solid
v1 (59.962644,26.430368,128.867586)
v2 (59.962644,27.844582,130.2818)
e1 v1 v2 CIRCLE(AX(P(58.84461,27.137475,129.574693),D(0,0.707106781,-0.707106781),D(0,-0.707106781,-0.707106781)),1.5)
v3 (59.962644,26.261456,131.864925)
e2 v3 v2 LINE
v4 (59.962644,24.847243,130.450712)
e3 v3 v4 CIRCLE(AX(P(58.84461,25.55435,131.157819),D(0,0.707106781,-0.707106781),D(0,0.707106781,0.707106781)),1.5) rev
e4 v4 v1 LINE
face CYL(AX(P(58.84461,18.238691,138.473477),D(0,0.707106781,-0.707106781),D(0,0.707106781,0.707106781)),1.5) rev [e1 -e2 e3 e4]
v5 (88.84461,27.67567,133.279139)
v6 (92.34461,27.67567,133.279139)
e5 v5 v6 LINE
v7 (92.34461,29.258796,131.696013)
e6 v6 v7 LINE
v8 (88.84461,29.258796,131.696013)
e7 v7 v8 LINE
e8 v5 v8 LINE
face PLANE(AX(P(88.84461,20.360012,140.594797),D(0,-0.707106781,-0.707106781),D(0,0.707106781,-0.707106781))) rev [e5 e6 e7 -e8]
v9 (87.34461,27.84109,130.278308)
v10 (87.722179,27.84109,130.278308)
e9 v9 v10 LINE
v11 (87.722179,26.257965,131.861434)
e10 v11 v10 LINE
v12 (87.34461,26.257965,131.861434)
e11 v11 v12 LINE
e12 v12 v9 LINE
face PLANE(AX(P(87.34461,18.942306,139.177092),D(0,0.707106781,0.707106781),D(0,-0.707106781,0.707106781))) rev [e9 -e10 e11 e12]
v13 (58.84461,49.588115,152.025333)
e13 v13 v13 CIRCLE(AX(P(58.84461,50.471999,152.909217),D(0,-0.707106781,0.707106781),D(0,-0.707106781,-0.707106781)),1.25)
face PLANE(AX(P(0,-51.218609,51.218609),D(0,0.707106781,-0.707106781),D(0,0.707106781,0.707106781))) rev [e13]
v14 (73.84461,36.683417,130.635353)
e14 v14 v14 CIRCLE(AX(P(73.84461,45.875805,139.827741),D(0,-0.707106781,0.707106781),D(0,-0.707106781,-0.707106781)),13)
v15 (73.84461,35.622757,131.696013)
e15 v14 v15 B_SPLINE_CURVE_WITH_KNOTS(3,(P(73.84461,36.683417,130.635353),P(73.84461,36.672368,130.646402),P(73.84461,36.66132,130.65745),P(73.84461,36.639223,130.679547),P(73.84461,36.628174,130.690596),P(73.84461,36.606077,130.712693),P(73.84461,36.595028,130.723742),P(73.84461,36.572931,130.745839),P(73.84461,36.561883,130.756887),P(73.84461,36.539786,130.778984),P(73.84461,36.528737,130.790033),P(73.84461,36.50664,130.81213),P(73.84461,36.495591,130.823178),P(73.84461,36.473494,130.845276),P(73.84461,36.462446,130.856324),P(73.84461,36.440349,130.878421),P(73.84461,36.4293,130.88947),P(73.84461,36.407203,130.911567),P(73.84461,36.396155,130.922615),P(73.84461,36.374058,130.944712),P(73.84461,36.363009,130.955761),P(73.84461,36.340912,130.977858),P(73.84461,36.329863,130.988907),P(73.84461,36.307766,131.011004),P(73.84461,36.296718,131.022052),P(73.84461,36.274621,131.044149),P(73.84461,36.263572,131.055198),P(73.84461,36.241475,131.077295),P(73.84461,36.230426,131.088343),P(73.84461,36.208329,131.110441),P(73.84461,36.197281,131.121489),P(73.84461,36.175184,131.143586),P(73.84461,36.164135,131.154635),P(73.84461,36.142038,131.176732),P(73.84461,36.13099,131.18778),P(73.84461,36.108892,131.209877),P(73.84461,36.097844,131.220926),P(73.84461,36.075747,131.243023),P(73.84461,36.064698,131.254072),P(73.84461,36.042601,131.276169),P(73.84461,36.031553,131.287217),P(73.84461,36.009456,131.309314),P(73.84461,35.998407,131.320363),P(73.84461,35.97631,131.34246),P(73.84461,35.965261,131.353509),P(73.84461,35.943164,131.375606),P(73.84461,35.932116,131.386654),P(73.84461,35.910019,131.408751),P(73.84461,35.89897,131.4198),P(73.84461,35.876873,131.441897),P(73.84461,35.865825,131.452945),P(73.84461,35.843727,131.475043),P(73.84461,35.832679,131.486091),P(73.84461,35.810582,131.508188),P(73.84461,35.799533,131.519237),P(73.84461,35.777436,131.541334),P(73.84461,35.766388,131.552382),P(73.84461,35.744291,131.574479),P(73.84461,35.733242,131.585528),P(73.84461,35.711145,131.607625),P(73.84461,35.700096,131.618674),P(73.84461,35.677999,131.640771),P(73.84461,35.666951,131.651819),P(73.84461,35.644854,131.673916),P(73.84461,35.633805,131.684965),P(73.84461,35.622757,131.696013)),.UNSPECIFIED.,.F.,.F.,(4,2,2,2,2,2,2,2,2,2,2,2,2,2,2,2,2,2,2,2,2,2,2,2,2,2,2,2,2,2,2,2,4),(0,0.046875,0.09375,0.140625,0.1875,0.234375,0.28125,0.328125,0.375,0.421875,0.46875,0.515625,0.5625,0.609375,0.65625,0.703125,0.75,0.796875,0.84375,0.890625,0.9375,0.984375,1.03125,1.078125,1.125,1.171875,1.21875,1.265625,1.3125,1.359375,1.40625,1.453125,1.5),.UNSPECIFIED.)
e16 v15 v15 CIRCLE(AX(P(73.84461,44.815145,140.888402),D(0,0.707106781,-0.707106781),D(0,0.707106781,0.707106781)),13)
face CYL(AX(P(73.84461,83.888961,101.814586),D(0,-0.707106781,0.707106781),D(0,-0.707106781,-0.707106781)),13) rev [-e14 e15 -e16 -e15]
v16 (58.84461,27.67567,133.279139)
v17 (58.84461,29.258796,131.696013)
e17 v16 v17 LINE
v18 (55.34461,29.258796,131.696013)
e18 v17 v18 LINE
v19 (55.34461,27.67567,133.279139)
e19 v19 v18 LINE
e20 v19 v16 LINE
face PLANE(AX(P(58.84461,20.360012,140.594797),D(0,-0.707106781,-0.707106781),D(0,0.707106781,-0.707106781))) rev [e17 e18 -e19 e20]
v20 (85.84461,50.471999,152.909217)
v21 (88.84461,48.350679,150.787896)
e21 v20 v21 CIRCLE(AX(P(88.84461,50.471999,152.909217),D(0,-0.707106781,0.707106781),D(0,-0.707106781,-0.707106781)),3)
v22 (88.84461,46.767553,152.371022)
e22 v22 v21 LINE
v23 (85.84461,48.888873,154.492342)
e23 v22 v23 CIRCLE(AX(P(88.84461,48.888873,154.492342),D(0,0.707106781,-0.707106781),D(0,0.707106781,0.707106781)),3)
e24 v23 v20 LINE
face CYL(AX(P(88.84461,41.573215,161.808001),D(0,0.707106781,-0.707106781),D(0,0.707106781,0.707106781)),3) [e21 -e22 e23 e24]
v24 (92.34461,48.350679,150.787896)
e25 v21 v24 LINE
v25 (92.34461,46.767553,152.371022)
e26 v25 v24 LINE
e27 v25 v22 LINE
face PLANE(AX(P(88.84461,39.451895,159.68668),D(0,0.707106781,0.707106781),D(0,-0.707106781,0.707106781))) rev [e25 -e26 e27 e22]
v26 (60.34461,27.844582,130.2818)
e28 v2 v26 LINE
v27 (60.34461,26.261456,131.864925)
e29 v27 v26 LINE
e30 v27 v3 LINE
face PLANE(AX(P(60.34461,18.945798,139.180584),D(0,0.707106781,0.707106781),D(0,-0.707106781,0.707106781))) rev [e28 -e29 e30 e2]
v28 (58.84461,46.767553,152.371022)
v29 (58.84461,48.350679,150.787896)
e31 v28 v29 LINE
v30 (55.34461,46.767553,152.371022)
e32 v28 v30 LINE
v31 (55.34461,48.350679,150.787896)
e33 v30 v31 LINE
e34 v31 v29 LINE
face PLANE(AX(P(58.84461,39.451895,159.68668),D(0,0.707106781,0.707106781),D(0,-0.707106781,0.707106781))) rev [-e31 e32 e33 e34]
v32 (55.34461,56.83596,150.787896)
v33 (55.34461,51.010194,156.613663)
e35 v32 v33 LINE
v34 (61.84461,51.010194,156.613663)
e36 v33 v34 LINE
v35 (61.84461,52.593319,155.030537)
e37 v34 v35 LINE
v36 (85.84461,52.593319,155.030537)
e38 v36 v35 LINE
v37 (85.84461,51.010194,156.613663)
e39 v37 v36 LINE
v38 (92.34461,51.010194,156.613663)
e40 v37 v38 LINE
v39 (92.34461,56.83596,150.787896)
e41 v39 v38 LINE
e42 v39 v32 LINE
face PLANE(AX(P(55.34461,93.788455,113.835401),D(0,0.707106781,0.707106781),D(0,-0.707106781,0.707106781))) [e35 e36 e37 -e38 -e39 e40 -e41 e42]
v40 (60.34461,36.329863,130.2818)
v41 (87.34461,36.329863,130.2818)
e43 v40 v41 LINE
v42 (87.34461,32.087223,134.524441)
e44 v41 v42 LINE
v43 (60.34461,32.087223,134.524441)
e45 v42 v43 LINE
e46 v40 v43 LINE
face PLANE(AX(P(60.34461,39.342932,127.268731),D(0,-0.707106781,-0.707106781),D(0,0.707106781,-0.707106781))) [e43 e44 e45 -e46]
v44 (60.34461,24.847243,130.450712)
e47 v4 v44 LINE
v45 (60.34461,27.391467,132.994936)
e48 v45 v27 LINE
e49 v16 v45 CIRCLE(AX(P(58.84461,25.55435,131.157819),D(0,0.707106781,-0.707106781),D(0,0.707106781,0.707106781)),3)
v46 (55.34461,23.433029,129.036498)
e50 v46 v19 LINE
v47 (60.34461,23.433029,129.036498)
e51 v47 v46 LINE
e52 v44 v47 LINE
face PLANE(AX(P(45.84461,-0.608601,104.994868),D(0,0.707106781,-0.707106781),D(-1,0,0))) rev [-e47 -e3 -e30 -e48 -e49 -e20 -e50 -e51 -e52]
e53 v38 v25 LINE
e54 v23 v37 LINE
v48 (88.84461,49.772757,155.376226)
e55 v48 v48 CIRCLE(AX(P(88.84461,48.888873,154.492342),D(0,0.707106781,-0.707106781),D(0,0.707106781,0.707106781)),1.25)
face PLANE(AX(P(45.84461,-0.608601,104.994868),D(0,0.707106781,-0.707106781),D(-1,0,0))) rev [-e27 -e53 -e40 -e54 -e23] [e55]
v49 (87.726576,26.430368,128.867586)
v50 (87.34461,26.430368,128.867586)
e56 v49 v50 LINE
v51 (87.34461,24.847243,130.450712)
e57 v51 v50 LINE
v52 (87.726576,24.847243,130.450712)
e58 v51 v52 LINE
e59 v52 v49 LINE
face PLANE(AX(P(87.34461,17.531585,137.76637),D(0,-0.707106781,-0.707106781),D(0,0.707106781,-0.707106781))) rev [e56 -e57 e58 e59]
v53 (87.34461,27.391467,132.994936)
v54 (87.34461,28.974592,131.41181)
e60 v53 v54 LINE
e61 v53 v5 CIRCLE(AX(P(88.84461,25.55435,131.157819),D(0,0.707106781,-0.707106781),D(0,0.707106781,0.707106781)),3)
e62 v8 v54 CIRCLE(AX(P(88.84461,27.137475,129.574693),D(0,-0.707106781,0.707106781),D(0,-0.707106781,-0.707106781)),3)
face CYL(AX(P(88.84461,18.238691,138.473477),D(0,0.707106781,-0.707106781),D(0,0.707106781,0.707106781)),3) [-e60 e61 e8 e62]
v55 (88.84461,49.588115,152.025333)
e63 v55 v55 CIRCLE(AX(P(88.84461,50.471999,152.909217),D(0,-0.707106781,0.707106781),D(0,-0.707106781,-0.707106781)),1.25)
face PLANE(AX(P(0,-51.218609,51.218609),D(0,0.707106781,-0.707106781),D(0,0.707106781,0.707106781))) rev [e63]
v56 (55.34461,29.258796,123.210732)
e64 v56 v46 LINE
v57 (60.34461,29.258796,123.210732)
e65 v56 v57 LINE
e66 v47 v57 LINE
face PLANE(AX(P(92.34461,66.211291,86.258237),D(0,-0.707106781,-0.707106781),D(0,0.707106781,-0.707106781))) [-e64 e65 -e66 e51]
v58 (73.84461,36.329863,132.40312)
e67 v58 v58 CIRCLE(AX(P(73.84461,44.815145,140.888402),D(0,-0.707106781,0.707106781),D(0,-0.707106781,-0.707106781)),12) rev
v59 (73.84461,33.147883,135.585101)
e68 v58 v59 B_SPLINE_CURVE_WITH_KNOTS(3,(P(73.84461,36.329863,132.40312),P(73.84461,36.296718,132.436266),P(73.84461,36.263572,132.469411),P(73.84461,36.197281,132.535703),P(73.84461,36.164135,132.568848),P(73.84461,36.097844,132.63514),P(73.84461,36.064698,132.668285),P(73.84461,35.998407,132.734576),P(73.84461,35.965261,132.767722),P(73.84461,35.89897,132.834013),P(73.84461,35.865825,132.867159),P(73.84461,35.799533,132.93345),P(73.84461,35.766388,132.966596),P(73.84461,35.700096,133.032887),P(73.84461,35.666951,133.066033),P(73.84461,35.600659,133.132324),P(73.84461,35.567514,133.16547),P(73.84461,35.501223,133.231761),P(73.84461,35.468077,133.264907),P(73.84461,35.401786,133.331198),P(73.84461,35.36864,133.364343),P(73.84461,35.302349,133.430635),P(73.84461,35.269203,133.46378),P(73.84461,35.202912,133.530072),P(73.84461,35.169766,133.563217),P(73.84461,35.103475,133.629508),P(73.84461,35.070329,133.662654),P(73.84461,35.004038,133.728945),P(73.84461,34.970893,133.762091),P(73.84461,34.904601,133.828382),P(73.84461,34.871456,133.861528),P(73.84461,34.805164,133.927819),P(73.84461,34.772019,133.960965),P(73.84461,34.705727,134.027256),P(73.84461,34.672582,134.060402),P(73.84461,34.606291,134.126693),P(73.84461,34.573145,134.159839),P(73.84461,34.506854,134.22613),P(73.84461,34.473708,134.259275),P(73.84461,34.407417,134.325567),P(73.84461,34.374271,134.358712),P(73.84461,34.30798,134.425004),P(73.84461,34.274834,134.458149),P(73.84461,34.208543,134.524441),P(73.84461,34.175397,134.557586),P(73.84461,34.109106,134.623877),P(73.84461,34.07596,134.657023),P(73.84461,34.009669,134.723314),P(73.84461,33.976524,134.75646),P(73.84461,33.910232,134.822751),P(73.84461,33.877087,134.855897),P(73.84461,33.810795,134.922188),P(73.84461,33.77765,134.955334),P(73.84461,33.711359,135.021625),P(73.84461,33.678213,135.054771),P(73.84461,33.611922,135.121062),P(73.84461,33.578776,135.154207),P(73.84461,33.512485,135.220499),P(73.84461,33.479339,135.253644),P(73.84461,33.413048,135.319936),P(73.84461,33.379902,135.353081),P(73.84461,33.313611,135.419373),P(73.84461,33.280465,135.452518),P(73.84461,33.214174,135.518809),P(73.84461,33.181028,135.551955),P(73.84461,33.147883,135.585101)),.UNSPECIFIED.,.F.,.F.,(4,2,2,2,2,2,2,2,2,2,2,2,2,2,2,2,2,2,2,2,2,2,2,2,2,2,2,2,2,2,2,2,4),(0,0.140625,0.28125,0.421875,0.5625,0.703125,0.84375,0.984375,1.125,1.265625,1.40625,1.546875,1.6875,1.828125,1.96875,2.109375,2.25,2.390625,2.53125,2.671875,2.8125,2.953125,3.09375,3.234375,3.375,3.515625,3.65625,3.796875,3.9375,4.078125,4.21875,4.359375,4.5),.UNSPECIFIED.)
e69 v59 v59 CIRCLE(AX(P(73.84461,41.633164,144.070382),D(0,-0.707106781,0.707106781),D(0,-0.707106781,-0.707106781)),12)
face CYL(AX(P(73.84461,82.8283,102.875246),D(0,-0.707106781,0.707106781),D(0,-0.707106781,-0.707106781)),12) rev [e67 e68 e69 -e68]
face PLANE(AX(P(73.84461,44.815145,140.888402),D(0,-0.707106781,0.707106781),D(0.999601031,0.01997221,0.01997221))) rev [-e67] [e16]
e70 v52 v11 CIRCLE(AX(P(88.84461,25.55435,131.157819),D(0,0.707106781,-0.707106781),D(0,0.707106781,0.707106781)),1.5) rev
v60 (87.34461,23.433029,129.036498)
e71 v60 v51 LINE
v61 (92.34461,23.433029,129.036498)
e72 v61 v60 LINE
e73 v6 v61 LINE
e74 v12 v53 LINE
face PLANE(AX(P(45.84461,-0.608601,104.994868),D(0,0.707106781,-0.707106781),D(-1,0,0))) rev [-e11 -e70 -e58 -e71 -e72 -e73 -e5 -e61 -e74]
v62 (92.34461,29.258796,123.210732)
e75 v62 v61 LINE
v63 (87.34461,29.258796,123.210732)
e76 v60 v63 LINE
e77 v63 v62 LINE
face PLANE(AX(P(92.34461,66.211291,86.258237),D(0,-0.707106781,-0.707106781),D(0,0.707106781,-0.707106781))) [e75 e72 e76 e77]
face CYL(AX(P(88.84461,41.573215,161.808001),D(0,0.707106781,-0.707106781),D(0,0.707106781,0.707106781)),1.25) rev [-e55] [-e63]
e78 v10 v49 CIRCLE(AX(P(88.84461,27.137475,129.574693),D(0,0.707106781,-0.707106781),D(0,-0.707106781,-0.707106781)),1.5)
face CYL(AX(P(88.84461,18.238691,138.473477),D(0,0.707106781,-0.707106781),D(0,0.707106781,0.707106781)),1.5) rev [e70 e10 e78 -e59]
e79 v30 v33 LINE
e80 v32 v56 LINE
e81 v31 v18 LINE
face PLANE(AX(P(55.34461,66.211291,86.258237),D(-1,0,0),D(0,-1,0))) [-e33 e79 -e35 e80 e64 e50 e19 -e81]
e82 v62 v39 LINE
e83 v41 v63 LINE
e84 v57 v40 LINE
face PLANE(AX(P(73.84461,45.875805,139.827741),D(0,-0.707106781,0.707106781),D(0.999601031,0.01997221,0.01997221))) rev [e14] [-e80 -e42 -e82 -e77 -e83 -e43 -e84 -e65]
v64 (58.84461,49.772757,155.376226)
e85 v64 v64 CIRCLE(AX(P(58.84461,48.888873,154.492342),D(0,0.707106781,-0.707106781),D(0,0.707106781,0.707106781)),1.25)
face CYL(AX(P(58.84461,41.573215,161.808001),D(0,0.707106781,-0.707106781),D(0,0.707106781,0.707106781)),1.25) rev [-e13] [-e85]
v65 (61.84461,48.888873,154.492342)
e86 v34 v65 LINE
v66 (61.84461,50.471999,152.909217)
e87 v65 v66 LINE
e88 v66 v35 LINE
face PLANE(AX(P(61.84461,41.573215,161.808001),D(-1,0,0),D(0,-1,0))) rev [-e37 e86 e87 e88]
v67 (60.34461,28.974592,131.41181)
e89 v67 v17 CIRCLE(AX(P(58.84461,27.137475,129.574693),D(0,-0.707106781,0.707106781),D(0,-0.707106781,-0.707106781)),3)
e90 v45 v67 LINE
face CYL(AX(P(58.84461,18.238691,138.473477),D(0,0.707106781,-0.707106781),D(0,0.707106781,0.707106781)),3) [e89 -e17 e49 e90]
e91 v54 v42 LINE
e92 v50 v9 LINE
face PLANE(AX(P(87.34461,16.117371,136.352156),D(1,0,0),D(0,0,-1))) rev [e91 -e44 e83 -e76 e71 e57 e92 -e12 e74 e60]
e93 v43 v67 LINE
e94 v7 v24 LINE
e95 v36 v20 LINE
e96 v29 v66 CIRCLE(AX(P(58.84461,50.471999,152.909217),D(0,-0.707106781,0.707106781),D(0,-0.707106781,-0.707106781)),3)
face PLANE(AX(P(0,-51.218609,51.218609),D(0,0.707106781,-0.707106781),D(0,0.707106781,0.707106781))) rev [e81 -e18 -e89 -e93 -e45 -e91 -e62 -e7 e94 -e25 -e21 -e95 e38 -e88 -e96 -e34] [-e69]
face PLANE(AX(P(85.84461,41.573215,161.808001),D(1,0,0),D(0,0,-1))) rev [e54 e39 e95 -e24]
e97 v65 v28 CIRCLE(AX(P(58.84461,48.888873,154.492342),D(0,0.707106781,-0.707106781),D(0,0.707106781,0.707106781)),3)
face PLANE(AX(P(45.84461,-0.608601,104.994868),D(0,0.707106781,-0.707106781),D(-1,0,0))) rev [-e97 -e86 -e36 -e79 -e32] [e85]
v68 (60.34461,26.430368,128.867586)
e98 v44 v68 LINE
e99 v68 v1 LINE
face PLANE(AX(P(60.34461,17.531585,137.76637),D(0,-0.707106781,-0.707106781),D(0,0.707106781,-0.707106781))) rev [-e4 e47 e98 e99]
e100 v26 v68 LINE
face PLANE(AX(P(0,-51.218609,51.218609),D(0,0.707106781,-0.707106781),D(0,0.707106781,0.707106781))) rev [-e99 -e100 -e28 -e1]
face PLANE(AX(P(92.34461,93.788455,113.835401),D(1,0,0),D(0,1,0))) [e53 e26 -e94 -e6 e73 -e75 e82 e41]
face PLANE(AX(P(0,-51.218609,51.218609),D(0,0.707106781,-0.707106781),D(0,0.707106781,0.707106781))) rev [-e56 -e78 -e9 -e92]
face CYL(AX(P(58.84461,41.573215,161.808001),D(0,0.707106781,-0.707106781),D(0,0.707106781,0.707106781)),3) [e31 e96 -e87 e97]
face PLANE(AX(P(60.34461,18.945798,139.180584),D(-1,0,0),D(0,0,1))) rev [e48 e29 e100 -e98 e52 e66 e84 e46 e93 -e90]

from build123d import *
from OCP.BRepAlgoAPI import BRepAlgoAPI_Cut
from OCP.TopTools import TopTools_ListOfShape

# Parameters (mm, degrees)
SKETCH3_W               = 37
SKETCH3_H               = 39
SKETCH3_R               = 12
BOSS_EXTRUDE1_DEPTH     = 4.5
SKETCH4_W               = 37
SKETCH4_H               = 39
SKETCH4_R               = 13
BOSS_EXTRUDE2_DEPTH     = 1.5
SKETCH5_R               = 1.25
BOSS_EXTRUDE4_DEPTH     = 2.238877686
CUT_EXTRUDE1_DEPTH      = 3
CUT_EXTRUDE1_DEPTH_BACK = 7.261122
SKETCH7_W               = 27
SKETCH7_H               = 10


with BuildPart() as part:
    # Sketch3 → Boss-Extrude1 (new body)
    with BuildSketch(Plane(origin=(0, -51.218608926, 51.218608926), x_dir=(1, 0, 0), z_dir=(-2.4581031654591364e-15, -0.7071067811865478, 0.7071067811865472))):
        with Locations((73.844609768, 127.312236852)):
            Rectangle(SKETCH3_W, SKETCH3_H)
        with Locations(Location((73.844609768, 131.312236852, 0), (0, 0, 270))):
            Circle(SKETCH3_R, mode=Mode.SUBTRACT)
    extrude(amount=-BOSS_EXTRUDE1_DEPTH)

    # Sketch4 → Boss-Extrude2 (add)
    with BuildSketch(Plane(origin=(0, -48.036628411, 48.036628411), x_dir=(1, 0, 0), z_dir=(2.4581031654591364e-15, 0.7071067811865478, -0.7071067811865472))):
        with Locations((73.844609768, -127.312236852)):
            Rectangle(SKETCH4_W, SKETCH4_H)
        with Locations(Location((73.844609768, -131.312236852, 0), (0, 0, 90))):
            Circle(SKETCH4_R, mode=Mode.SUBTRACT)
    extrude(amount=BOSS_EXTRUDE2_DEPTH)

    # Sketch5 → Boss-Extrude4 (add)
    # profile 1 of 4: a face of its own
    with BuildSketch(Plane(origin=(0, -51.218608926, 51.218608926), x_dir=(1, 0, 0), z_dir=(-2.386964886512496e-15, -0.7071067811865477, 0.7071067811865475))):
        with BuildLine():
            Line((92.344609768, 107.812236852), (92.344609768, 113.812236852))
            Line((92.344609768, 113.812236852), (88.844609768, 113.812236852))
            ThreePointArc((88.844609768, 113.812236852), (88.068152632, 113.710014331), (87.344609768, 113.410313064))
            Line((87.344609768, 113.410313064), (87.344609768, 111.807298734))
            Line((87.344609768, 111.807298734), (87.722178544, 111.807298734))
            ThreePointArc((87.722178544, 111.807298734), (90.344606124, 110.815542933), (87.726575779, 109.812236852))
            Line((87.726575779, 109.812236852), (87.344609768, 109.812236852))
            Line((87.344609768, 109.812236852), (87.344609768, 107.812236852))
            Line((87.344609768, 107.812236852), (92.344609768, 107.812236852))
        make_face()
    # profile 2 of 4: a face of its own
    with BuildSketch(Plane(origin=(0, -51.218608926, 51.218608926), x_dir=(1, 0, 0), z_dir=(-2.386964886512496e-15, -0.7071067811865477, 0.7071067811865475))):
        with BuildLine():
            Line((55.344609768, 107.812236852), (60.344609768, 107.812236852))
            Line((60.344609768, 107.812236852), (60.344609768, 109.812236852))
            Line((60.344609768, 109.812236852), (59.962643756, 109.812236852))
            ThreePointArc((59.962643756, 109.812236852), (57.344609768, 110.812236852), (59.962643756, 111.812236852))
            Line((59.962643756, 111.812236852), (60.344609768, 111.812236852))
            Line((60.344609768, 111.812236852), (60.344609768, 113.410313064))
            ThreePointArc((60.344609768, 113.410313064), (59.621066903, 113.710014331), (58.844609768, 113.812236852))
            Line((58.844609768, 113.812236852), (55.344609768, 113.812236852))
            Line((55.344609768, 113.812236852), (55.344609768, 107.812236852))
        make_face()
    # profile 3 of 4: a face of its own
    with BuildSketch(Plane(origin=(0, -51.218608926, 51.218608926), x_dir=(1, 0, 0), z_dir=(-2.386964886512496e-15, -0.7071067811865477, 0.7071067811865475))):
        with BuildLine():
            Line((55.344609768, 146.812236852), (55.344609768, 140.812236852))
            Line((55.344609768, 140.812236852), (58.844609768, 140.812236852))
            ThreePointArc((58.844609768, 140.812236852), (60.965930111, 141.690916509), (61.844609768, 143.812236852))
            Line((61.844609768, 143.812236852), (61.844609768, 146.812236852))
            Line((61.844609768, 146.812236852), (55.344609768, 146.812236852))
        make_face()
        with Locations(Location((58.844609768, 143.812236852, 0), (0, 0, 90))):
            Circle(SKETCH5_R, mode=Mode.SUBTRACT)
    # profile 4 of 4: a face of its own
    with BuildSketch(Plane(origin=(0, -51.218608926, 51.218608926), x_dir=(1, 0, 0), z_dir=(-2.386964886512496e-15, -0.7071067811865477, 0.7071067811865475))):
        with BuildLine():
            Line((92.344609768, 146.812236852), (85.844609768, 146.812236852))
            Line((85.844609768, 146.812236852), (85.844609768, 143.812236852))
            ThreePointArc((85.844609768, 143.812236852), (86.723289424, 141.690916509), (88.844609768, 140.812236852))
            Line((88.844609768, 140.812236852), (92.344609768, 140.812236852))
            Line((92.344609768, 140.812236852), (92.344609768, 146.812236852))
        make_face()
        with Locations(Location((88.844609768, 143.812236852, 0), (0, 0, 90))):
            Circle(SKETCH5_R, mode=Mode.SUBTRACT)
    extrude(amount=BOSS_EXTRUDE4_DEPTH)


with BuildPart() as cut_extrude1_tool:
    # Sketch7 → Cut-Extrude1 (new, two sides: drawn at the far end of the back side and taken through both)
    with BuildSketch(Plane(origin=(0, -46.084220099, 46.084220099), x_dir=(1, 0, 0), z_dir=(0, 0.7071067811865502, -0.7071067811865449)).offset(-CUT_EXTRUDE1_DEPTH_BACK)):
        with Locations((73.844609768, -112.812236852)):
            Rectangle(SKETCH7_W, SKETCH7_H)
    extrude(amount=CUT_EXTRUDE1_DEPTH + CUT_EXTRUDE1_DEPTH_BACK)


with BuildPart() as part_1:
    add(part.part)

    # Cut-Extrude1: cut by cut_extrude1_tool, with a tolerance
    cut_extrude1_stock = TopTools_ListOfShape()
    cut_extrude1_stock.Append(part_1.part.wrapped)
    cut_extrude1_tools = TopTools_ListOfShape()
    cut_extrude1_tools.Append(cut_extrude1_tool.part.wrapped)
    cut_extrude1_cut = BRepAlgoAPI_Cut()
    cut_extrude1_cut.SetArguments(cut_extrude1_stock)
    cut_extrude1_cut.SetTools(cut_extrude1_tools)
    cut_extrude1_cut.SetFuzzyValue(0.00001)
    cut_extrude1_cut.Build()
    add(Compound.cast(cut_extrude1_cut.Shape()).solids(), mode=Mode.REPLACE)


solid = part_1.part
